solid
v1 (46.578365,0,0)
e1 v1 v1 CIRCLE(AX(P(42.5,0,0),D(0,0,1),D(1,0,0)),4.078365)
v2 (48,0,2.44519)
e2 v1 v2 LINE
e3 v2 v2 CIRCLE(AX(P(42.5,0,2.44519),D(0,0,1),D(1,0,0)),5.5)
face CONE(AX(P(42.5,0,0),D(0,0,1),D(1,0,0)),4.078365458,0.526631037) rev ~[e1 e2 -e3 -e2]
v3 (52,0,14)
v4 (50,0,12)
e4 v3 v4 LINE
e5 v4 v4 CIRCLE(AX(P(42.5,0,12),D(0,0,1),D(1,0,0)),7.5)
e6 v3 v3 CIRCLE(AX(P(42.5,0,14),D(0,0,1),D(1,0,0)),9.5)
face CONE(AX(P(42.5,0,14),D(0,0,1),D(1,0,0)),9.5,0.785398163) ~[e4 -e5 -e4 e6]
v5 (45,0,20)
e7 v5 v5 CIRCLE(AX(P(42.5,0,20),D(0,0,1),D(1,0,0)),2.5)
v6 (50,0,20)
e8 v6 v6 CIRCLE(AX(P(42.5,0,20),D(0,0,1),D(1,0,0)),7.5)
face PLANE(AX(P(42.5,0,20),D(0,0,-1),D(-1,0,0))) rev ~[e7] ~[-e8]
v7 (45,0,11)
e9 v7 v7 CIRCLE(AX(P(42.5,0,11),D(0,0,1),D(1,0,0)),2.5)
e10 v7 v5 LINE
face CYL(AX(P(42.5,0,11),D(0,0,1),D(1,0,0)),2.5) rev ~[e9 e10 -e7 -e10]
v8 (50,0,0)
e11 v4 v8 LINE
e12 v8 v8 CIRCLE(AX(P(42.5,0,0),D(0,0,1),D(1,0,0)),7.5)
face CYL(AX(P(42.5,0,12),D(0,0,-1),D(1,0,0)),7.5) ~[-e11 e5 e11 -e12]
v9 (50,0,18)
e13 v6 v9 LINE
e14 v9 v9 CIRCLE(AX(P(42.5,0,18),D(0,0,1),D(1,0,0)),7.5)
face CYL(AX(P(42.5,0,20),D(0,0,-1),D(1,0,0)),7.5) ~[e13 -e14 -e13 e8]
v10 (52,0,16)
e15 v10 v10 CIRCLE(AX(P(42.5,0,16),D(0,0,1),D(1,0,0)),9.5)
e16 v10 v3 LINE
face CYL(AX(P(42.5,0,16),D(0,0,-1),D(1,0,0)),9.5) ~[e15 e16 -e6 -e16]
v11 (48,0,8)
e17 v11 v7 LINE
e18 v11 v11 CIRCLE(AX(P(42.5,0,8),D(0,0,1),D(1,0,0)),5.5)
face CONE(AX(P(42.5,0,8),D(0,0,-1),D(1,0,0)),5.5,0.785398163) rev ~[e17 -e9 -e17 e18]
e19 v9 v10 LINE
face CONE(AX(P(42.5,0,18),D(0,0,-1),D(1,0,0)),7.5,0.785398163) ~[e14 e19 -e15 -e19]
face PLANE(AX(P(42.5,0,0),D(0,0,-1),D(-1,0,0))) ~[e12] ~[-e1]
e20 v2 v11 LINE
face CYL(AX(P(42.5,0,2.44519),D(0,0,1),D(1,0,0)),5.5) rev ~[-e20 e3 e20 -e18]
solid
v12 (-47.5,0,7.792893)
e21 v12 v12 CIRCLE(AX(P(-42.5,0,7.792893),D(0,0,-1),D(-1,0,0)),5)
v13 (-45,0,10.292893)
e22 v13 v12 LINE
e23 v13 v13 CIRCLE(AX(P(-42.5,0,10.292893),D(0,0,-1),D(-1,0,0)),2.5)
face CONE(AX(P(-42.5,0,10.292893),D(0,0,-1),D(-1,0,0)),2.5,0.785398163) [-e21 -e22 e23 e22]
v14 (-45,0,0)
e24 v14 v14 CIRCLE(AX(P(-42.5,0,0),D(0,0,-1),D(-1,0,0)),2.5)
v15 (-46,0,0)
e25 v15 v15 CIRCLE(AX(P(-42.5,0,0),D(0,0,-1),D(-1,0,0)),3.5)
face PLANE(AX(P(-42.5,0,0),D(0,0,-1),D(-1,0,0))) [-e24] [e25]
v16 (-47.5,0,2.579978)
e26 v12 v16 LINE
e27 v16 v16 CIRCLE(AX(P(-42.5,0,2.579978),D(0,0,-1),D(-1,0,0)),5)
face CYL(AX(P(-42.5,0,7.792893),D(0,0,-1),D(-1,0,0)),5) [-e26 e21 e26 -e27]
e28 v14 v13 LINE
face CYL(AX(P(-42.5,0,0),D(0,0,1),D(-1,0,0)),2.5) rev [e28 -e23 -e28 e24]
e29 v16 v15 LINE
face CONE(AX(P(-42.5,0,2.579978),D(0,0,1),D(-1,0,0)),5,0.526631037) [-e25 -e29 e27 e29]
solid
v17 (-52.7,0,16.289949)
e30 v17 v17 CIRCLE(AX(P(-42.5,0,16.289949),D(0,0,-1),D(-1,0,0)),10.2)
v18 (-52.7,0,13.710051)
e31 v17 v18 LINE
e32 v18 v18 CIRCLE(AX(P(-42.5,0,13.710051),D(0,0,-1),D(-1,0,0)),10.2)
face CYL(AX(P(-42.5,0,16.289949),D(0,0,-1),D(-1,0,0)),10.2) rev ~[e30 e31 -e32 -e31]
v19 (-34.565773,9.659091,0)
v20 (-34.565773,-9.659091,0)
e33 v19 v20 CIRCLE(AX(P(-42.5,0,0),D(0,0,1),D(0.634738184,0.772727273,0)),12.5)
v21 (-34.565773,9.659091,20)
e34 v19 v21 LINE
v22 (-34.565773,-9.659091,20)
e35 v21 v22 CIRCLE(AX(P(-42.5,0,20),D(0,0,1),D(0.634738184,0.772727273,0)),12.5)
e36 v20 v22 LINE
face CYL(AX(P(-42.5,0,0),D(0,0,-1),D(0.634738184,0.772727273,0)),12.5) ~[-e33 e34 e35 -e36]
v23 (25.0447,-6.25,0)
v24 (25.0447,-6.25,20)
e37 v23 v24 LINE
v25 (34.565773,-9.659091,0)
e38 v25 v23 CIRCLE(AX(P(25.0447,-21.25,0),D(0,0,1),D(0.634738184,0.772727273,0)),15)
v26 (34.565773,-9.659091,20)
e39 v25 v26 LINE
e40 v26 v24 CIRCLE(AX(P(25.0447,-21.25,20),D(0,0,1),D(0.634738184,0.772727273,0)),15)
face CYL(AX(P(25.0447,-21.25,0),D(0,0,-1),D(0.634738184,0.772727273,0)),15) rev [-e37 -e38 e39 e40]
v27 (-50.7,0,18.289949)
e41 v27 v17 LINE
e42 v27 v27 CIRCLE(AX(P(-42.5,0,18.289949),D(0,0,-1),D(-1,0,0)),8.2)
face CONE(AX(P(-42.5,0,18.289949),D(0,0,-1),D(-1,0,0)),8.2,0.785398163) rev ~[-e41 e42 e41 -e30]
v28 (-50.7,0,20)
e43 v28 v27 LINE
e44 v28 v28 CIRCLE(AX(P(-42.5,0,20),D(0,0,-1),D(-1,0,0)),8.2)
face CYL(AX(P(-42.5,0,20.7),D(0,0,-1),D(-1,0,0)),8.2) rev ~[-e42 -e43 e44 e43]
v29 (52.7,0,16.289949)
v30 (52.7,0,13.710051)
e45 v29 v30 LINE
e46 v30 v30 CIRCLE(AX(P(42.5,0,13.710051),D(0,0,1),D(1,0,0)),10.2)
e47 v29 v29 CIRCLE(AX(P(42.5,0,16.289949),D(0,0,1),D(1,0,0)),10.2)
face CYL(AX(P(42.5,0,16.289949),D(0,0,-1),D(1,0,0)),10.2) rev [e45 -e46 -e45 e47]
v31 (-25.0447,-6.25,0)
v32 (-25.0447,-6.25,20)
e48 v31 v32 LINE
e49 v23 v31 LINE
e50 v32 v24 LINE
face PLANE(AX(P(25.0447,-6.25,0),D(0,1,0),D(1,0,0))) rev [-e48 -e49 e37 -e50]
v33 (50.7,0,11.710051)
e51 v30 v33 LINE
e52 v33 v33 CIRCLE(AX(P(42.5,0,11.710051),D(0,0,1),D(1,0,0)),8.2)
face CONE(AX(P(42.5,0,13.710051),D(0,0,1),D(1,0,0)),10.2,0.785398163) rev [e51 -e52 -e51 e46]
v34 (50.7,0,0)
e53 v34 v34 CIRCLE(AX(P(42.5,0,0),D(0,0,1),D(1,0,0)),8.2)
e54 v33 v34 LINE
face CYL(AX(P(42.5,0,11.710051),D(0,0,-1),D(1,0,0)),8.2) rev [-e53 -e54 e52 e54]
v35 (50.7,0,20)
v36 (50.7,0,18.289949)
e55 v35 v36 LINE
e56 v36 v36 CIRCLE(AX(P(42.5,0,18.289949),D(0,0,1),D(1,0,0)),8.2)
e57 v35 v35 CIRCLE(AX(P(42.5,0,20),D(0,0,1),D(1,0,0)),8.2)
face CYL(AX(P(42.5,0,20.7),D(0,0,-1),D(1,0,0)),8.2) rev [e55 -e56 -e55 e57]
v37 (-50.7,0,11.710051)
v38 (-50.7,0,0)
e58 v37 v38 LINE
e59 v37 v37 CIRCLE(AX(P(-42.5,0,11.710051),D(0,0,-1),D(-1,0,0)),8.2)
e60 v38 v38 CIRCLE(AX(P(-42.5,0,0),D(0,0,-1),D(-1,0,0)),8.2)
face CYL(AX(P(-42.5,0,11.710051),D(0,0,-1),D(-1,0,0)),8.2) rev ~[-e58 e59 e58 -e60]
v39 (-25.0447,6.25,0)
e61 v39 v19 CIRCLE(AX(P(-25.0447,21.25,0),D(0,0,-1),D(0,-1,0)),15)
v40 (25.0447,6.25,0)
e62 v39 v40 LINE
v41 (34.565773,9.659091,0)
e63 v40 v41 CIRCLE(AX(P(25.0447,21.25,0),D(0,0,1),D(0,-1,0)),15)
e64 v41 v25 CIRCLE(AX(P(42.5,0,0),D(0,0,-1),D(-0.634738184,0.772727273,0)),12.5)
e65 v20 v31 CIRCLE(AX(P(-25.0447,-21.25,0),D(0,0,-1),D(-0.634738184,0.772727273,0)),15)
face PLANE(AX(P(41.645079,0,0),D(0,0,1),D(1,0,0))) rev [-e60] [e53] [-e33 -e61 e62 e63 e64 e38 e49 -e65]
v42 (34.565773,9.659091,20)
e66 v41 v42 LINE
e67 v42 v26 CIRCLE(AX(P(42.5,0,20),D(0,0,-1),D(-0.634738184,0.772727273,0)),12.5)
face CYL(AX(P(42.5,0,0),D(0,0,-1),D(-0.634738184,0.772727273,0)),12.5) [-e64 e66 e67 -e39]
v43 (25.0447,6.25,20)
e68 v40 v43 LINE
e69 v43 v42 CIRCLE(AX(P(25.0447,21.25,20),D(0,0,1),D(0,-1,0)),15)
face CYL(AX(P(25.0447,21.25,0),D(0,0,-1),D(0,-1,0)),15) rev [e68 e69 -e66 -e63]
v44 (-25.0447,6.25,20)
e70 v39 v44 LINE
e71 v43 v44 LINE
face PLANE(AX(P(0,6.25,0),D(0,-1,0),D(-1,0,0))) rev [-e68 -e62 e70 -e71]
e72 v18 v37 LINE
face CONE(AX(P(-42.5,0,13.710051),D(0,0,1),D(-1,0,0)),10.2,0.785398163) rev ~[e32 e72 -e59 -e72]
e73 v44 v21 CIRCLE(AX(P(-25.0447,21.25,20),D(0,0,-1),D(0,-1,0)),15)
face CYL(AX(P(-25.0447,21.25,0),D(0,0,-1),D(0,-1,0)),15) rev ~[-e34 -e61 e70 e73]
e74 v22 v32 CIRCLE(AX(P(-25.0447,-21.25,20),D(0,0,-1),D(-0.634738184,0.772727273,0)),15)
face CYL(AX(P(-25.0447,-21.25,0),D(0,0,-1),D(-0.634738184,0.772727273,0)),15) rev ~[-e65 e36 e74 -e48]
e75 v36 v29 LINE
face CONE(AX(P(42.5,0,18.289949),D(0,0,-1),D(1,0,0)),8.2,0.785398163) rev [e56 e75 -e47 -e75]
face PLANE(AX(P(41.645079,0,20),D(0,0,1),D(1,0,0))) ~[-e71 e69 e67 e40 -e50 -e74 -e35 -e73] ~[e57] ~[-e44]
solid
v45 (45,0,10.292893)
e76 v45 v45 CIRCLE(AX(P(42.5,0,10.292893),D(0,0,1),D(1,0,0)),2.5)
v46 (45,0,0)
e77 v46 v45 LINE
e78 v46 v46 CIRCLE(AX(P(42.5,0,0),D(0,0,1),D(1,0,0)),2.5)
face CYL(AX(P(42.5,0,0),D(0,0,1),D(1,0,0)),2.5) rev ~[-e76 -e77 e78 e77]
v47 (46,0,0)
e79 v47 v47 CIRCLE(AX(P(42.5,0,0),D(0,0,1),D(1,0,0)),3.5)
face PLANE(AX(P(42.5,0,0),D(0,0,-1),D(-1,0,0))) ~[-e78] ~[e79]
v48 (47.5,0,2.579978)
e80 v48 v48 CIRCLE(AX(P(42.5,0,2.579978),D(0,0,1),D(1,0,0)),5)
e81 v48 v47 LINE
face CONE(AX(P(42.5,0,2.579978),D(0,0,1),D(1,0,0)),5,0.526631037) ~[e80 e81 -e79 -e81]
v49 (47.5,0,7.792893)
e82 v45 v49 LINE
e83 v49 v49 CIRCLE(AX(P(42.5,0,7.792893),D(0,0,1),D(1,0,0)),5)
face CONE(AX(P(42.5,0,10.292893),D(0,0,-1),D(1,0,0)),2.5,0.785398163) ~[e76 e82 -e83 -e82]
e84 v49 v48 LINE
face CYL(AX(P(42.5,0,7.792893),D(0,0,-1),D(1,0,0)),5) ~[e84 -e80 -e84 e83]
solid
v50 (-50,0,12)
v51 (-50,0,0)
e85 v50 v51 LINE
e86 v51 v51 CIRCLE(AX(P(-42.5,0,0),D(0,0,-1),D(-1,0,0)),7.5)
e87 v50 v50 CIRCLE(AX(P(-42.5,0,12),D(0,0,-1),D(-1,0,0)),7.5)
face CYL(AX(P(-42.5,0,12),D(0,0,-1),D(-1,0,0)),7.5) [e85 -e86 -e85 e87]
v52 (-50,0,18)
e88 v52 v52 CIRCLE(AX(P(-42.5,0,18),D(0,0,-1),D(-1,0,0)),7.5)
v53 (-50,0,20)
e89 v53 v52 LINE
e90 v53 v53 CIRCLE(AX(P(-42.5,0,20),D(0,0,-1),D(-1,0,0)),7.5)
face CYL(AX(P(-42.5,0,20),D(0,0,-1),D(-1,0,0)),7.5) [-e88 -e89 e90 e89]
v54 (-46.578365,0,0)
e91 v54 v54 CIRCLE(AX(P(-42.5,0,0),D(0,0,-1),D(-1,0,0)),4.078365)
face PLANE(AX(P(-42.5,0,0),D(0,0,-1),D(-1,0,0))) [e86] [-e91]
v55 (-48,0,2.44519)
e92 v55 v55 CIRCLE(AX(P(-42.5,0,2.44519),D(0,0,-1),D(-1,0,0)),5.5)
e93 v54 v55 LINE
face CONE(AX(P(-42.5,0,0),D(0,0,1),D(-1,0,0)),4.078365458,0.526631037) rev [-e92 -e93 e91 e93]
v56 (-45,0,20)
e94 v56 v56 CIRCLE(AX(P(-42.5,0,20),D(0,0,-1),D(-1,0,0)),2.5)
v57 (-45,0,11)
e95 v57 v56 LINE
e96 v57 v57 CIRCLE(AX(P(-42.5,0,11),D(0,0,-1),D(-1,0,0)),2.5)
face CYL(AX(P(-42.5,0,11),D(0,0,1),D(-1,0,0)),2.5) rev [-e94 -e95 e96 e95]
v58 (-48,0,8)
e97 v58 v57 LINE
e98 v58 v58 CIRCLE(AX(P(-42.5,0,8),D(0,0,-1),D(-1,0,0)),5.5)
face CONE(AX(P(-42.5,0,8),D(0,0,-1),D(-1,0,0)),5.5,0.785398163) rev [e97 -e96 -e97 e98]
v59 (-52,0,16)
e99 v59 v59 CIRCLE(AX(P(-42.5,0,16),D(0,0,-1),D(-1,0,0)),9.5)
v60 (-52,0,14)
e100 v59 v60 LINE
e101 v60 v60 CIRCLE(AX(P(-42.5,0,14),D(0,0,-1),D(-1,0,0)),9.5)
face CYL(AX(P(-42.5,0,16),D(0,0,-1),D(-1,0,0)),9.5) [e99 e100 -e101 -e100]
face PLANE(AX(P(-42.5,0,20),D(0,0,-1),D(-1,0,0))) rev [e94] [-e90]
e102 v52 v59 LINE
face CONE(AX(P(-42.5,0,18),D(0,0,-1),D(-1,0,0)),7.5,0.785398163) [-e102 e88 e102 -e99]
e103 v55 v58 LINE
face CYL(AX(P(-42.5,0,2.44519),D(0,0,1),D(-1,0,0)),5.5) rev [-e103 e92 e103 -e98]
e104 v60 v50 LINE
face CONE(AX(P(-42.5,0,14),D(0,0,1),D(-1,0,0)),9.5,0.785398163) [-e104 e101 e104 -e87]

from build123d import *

# Parameters (mm, degrees)
F4_DEPTH = 20


with BuildPart() as f1:
    # F0 (on Front) → F1 (revolve)
    with BuildSketch(Plane.XZ):
        Polygon((-50, 12), (-50, 18), (-52, 16), (-52, 14), align=None)
        Polygon((-46, 10), (-46, 20), (-50, 20), (-50, 18), (-50, 12), (-50, 10), align=None)
        Polygon((-48, 8), (-46, 10), (-50, 10), (-50, 0), (-46.5783654576, 0), (-48, 2.4451902232), align=None)
        Polygon((-45, 11), (-45, 20), (-46, 20), (-46, 10), align=None)
    revolve(axis=Axis((-42.5, 0, 15), (0, 0, -1)))


with BuildPart() as f1b:
    # F0 (on Front) → F1, piece 2 (revolve)
    with BuildSketch(Plane.XZ):
        Polygon((-46, 0), (-46, 9.2928932188), (-47.5, 7.7928932188), (-47.5, 2.5799776423), align=None)
        Polygon((-45, 10.2928932188), (-46, 9.2928932188), (-46, 0), (-45, 0), (-45, 9.2928932188), align=None)
    revolve(axis=Axis((-42.5, 0, 15), (0, 0, -1)))


with BuildPart() as f4:
    # F3 (on Top) → F4 (new body)
    with BuildSketch(Plane.XY):
        with BuildLine():
            ThreePointArc((-31.6746824527, -6.25), (-30.4259271714, -3.2352380638), (-30, 0))
            ThreePointArc((-30, 0), (-30.4259271714, 3.2352380638), (-31.6746824527, 6.25))
            ThreePointArc((-31.6746824527, 6.25), (-32.9666057512, 8.0848249268), (-34.5657727024, 9.6590909091))
            ThreePointArc((-34.5657727024, 9.6590909091), (-55, 0), (-34.5657727024, -9.6590909091))
            ThreePointArc((-34.5657727024, -9.6590909091), (-32.9666057512, -8.0848249268), (-31.6746824527, -6.25))
        make_face()
        with BuildLine():
            ThreePointArc((-31.6746824527, 6.25), (-30.4259271714, 3.2352380638), (-30, 0))
            ThreePointArc((-30, 0), (-30.4259271714, -3.2352380638), (-31.6746824527, -6.25))
            Line((-31.6746824527, -6.25), (-25.0446999453, -6.25))
            Line((-25.0446999453, -6.25), (0, -6.25))
            Line((0, -6.25), (0, 6.25))
            Line((0, 6.25), (-25.0446999453, 6.25))
            Line((-25.0446999453, 6.25), (-31.6746824527, 6.25))
        make_face()
        with BuildLine():
            ThreePointArc((-34.5657727024, 9.6590909091), (-32.9666057512, 8.0848249268), (-31.6746824527, 6.25))
            Line((-31.6746824527, 6.25), (-25.0446999453, 6.25))
            ThreePointArc((-25.0446999453, 6.25), (-30.1011989138, 7.1279669246), (-34.5657727024, 9.6590909091))
        make_face()
        with BuildLine():
            Line((-25.0446999453, -6.25), (-31.6746824527, -6.25))
            ThreePointArc((-31.6746824527, -6.25), (-32.9666057512, -8.0848249268), (-34.5657727024, -9.6590909091))
            ThreePointArc((-34.5657727024, -9.6590909091), (-30.1011989138, -7.1279669246), (-25.0446999453, -6.25))
        make_face()
    extrude(amount=F4_DEPTH)

    # F2 (on Front) → F5 (revolve, cut)
    with BuildSketch(Plane.XZ):
        Polygon((-50, 18), (-50, 20), (-42.5, 20), (-42.5, 20.7), (-50.7, 20.7), (-50.7, 18.2899494937), (-52.7, 16.2899494937), (-52.7, 13.7100505063), (-50.7, 11.7100505063), (-50.7, 0), (-50, 0), (-50, 12), (-52, 14), (-52, 16), align=None)
        Polygon((-42.5, 20), (-50, 20), (-50, 18), (-52, 16), (-52, 14), (-50, 12), (-50, 0), (-42.5, 0), align=None)
    revolve(axis=Axis((-42.5, 0, 10.35), (0, 0, -1)), mode=Mode.SUBTRACT)

    # F6: F4, F1, F1b across face


with BuildPart() as f4_1:
    add(f4.part)
    add(f4.part.mirror(Plane(origin=(0, 0, 10), x_dir=(0, 1, 0), z_dir=(1, 0, 0))))
    add(f1.part.mirror(Plane(origin=(0, 0, 10), x_dir=(0, 1, 0), z_dir=(1, 0, 0))))
    add(f1b.part.mirror(Plane(origin=(0, 0, 10), x_dir=(0, 1, 0), z_dir=(1, 0, 0))))


solid = Compound([f1.part, f1b.part, f4_1.part])
